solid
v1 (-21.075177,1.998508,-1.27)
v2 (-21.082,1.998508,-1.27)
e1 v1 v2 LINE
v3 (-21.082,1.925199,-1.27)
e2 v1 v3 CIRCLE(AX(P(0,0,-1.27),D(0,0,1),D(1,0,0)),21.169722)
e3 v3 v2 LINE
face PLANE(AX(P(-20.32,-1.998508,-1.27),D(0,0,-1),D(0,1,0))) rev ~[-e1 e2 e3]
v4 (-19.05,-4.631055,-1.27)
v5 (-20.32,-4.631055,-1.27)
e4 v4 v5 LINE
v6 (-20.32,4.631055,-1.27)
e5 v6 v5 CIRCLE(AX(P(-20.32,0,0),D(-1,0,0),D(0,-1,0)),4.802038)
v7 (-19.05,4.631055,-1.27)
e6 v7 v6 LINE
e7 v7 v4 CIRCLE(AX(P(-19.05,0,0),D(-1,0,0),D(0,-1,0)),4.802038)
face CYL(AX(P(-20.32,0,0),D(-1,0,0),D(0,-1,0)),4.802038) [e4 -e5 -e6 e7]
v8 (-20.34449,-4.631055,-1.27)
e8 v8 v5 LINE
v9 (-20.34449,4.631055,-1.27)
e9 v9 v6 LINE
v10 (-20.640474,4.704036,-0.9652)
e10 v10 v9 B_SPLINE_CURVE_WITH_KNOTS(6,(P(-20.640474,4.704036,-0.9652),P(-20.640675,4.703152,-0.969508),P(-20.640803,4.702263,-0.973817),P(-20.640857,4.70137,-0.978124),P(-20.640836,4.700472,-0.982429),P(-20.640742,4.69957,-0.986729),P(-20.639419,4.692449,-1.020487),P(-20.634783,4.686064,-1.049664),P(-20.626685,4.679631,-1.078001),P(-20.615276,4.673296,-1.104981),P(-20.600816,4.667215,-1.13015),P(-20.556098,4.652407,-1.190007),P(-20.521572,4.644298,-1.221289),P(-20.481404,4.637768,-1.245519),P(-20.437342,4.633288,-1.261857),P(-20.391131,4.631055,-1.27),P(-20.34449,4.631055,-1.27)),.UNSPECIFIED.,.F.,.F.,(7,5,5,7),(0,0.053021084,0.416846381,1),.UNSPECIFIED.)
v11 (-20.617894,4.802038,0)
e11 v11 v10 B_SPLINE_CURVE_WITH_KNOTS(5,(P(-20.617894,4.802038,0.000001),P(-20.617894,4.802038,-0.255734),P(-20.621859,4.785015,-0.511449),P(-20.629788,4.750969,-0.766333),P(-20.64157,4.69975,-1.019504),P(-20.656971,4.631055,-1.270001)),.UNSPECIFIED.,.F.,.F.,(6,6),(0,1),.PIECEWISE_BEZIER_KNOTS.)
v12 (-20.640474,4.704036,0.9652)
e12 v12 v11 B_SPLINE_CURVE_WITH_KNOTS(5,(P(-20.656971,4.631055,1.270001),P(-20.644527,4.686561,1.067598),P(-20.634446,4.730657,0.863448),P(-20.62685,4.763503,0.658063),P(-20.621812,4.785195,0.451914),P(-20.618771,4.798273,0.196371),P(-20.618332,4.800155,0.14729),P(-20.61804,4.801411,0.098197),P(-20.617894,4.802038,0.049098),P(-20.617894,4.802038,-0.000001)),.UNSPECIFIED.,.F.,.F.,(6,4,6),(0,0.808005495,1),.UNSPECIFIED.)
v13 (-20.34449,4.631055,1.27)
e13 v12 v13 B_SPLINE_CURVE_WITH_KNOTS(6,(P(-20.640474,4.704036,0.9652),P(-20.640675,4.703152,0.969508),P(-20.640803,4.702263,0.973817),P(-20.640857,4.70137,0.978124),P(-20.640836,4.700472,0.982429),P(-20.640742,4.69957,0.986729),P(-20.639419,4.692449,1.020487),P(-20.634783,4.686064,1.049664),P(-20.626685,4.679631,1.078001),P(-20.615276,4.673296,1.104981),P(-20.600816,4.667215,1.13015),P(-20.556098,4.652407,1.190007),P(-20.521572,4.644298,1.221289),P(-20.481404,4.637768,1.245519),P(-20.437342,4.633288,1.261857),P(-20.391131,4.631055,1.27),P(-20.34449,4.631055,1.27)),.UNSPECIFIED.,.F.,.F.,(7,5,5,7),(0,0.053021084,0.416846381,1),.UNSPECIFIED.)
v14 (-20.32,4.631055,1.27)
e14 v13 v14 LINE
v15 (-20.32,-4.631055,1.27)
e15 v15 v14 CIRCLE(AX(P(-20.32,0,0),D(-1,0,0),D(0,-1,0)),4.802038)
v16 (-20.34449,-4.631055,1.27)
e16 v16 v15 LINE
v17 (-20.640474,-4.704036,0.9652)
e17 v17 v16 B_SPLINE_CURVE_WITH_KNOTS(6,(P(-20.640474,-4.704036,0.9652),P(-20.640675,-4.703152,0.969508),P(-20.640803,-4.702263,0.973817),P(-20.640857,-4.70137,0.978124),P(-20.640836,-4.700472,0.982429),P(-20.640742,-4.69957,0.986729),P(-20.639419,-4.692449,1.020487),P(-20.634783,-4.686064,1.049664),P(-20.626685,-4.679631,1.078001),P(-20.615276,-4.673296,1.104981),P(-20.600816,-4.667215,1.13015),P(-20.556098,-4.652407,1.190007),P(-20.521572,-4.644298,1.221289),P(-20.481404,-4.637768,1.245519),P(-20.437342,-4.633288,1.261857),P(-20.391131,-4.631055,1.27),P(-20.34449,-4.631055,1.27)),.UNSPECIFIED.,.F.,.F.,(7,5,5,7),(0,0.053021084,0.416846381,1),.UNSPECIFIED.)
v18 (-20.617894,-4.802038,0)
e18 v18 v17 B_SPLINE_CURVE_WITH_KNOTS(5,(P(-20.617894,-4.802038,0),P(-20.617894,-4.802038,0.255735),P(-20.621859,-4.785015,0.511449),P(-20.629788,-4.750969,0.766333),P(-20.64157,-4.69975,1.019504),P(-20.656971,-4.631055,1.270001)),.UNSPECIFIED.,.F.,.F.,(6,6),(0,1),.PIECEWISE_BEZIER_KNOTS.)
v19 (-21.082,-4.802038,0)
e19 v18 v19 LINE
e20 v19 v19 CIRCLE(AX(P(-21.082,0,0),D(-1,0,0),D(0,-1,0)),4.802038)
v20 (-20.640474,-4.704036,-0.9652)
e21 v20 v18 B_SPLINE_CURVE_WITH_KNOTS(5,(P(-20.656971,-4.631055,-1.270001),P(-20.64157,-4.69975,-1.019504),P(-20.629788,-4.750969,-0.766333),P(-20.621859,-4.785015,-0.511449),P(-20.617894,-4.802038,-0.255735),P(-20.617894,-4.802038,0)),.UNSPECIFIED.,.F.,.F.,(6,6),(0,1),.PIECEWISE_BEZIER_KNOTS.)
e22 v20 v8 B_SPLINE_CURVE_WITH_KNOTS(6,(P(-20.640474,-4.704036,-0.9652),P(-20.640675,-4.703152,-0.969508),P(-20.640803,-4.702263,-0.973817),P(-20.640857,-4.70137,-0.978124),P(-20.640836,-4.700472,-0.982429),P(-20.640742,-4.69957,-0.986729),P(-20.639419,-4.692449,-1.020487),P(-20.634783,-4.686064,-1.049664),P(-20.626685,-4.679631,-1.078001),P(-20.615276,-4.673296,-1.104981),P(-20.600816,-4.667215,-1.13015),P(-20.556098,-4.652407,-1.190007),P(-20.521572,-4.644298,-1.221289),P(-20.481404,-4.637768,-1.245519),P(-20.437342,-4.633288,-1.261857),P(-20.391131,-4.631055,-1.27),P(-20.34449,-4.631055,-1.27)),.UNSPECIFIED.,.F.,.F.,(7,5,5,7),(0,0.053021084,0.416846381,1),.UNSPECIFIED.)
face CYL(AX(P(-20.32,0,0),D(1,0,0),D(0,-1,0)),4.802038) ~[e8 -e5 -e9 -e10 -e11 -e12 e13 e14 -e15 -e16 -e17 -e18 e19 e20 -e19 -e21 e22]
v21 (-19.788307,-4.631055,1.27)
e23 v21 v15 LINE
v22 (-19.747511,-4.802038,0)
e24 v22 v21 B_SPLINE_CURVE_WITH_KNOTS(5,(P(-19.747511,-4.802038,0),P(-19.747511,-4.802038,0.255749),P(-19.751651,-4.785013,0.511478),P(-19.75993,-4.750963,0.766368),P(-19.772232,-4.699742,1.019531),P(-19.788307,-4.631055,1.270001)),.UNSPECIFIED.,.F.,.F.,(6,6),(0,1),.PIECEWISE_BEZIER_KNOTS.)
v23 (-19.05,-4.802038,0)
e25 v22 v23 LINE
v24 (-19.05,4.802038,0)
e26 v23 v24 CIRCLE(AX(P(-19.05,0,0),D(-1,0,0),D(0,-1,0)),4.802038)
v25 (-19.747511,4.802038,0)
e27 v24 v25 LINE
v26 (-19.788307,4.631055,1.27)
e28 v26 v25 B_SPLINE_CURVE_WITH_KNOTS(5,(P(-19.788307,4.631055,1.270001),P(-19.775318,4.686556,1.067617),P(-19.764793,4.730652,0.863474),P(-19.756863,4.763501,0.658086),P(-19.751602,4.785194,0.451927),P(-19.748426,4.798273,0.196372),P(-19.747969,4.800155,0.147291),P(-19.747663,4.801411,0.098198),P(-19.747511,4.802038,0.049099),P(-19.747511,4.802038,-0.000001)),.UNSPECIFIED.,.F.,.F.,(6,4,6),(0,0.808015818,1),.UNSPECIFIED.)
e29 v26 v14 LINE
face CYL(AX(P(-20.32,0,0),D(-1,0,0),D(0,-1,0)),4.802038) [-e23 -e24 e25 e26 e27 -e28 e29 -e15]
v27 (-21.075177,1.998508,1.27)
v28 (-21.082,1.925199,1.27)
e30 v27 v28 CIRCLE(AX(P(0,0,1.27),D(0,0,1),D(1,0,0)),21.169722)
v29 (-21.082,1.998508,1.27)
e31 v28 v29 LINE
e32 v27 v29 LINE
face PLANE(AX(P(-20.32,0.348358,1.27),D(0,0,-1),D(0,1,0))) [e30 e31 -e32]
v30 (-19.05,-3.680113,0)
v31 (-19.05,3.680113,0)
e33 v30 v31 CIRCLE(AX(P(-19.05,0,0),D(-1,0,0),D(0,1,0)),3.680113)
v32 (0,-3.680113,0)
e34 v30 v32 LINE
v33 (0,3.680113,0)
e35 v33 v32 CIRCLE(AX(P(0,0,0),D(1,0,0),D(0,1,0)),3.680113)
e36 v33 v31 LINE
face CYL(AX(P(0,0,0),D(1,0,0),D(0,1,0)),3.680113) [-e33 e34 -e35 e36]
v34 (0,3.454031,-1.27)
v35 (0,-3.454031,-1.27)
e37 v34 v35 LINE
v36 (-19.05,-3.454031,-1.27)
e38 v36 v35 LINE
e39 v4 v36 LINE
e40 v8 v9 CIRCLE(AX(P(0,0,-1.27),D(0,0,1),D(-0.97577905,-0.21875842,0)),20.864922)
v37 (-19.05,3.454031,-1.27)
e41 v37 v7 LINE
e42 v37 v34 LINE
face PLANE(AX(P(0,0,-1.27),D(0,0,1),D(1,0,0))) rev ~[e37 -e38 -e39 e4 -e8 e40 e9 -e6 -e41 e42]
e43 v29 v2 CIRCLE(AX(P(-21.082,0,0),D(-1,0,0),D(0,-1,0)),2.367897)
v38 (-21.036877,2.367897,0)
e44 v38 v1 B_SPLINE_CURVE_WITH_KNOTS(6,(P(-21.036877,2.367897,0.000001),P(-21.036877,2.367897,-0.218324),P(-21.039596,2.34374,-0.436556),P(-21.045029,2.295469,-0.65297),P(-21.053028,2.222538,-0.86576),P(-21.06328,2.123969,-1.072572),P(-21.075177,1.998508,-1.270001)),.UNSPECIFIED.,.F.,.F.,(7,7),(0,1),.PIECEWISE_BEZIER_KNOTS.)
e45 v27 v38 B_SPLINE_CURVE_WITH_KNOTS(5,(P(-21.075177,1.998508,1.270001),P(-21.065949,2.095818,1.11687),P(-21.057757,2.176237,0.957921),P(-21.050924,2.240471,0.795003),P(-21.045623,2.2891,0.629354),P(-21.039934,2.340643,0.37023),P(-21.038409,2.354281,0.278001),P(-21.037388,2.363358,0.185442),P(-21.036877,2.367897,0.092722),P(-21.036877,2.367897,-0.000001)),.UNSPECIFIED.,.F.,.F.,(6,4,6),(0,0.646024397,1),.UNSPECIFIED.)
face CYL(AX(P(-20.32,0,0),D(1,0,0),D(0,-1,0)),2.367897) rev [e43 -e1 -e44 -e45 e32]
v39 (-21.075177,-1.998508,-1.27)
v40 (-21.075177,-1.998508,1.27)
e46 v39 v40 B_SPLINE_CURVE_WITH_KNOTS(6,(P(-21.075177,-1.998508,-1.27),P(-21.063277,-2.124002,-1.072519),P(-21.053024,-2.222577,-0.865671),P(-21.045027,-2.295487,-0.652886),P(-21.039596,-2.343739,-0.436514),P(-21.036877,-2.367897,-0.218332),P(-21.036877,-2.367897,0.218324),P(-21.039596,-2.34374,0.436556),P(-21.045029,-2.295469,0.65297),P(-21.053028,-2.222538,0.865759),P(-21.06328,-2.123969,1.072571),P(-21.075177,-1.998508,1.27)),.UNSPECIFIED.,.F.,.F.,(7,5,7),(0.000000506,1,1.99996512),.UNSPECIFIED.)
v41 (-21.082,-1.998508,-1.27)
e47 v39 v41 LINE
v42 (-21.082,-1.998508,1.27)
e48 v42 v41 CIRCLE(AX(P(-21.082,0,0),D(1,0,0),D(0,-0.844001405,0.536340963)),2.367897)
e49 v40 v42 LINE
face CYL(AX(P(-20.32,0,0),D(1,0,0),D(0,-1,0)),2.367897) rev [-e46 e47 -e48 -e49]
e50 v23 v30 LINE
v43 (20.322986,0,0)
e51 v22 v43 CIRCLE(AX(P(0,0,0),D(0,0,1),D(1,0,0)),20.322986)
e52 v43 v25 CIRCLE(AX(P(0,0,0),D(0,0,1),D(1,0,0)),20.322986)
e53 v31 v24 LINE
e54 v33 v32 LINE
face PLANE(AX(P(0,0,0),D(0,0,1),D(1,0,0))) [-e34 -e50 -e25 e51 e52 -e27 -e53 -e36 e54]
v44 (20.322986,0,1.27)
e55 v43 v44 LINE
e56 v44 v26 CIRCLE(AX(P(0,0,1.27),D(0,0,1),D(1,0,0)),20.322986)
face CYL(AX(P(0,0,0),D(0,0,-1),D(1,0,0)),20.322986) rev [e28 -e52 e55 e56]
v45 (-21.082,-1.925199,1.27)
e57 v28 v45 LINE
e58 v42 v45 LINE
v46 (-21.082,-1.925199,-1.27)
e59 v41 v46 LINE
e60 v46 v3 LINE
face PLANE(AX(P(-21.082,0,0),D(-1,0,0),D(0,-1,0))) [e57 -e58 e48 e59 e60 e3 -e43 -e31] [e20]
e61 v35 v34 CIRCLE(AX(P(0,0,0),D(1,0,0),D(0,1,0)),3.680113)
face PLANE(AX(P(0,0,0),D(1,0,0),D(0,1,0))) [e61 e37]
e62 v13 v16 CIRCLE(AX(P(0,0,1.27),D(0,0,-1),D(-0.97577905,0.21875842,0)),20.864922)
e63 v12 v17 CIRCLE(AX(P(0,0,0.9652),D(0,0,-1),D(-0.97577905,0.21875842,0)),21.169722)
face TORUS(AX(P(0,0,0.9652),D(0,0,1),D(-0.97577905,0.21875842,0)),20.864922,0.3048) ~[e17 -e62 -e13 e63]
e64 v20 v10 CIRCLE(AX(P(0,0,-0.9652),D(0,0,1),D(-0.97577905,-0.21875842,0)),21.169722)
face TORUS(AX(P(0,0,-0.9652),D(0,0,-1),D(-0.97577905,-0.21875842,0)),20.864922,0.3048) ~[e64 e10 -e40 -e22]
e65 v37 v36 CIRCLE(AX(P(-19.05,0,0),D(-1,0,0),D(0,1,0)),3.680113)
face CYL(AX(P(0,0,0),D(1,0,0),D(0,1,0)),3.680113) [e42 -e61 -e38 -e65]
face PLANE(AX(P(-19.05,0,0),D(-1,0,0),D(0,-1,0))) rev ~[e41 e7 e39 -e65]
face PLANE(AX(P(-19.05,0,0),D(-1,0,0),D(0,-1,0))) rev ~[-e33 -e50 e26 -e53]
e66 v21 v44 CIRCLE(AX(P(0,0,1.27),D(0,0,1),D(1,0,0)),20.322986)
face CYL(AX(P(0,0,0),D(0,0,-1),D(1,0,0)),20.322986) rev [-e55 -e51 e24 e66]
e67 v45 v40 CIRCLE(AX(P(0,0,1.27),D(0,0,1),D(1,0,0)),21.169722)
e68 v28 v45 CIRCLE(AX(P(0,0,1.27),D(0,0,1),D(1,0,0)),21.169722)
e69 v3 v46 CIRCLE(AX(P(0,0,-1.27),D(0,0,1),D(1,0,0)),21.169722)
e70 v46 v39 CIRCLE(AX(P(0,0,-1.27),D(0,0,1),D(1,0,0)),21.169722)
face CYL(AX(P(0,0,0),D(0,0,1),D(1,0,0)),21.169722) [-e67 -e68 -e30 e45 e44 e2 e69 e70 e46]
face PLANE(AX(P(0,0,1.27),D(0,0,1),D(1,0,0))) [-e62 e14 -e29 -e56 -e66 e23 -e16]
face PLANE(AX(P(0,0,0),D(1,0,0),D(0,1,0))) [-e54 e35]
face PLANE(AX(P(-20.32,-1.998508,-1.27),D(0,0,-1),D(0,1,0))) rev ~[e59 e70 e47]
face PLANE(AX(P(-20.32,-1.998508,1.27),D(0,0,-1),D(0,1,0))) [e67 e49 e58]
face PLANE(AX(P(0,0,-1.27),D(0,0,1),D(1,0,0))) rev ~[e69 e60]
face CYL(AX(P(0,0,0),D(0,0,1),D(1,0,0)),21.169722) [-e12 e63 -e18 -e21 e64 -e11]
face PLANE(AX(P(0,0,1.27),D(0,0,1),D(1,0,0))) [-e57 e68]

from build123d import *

# Parameters (mm, degrees)
F2_R      = 3.6801131425
F3_DEPTH  = 20.32
F4_R      = 4.8020380174
F4_R_2    = 3.6801131425
F5_DEPTH  = 1.27
F6_R      = 4.8020380174
F6_R_2    = 2.3678967055
F7_DEPTH  = 0.762
F9_R      = 21.1697216963
F9_R_2    = 20.3229858377
F10_DEPTH = 1.27
F8_R      = 21.1697216963
F11_DEPTH = 1.27
F12_R     = 0.3048
F13_DEPTH = 0.762


# Not quite as in the source:
# - the program builds the solid bodies; features that only make, move or delete a surface that nothing else refers to are left out


with BuildPart() as f3:
    # F2 (on Right) → F3 (new body)
    with BuildSketch(Plane.YZ):
        Circle(F2_R)
    extrude(amount=-F3_DEPTH)

    # F4 (on face) → F5 (join)
    with BuildSketch(Plane(origin=(-20.32, 0, 0), x_dir=(0, -1, 0), z_dir=(-1, 0, 0))):
        Circle(F4_R)
        Circle(F4_R_2, mode=Mode.SUBTRACT)
    extrude(amount=-F5_DEPTH)

    # F6 (on face) → F7 (join)
    with BuildSketch(Plane(origin=(-20.32, 0, 0), x_dir=(0, -1, 0), z_dir=(-1, 0, 0))):
        Circle(F6_R)
        Circle(F6_R_2, mode=Mode.SUBTRACT)
    extrude(amount=F7_DEPTH)

    # F9 (on face) → F10 (join)
    with BuildSketch(Plane.XY):
        Circle(F9_R)
        Circle(F9_R_2, mode=Mode.SUBTRACT)
    extrude(amount=F10_DEPTH)

    # F8 (on Top) → F11 (join)
    with BuildSketch(Plane.XY):
        Circle(F8_R)
    extrude(amount=-F11_DEPTH)

    # F12
    f12_edges = [f3.edges().sort_by_distance(p)[0] for p in [
        (21.169722, 0, -1.27),
        (21.169722, 0, 1.27),
    ]]
    fillet(f12_edges, radius=F12_R)

    # F13 (add): faces of the model
    f13_faces = [f3.faces().sort_by_distance(p)[0] for p in [
        (-20.32, 0, -1.7192532993),
        (-20.32, 0, 1.4782041027),
    ]]
    extrude(f13_faces, amount=F13_DEPTH)


solid = f3.part
